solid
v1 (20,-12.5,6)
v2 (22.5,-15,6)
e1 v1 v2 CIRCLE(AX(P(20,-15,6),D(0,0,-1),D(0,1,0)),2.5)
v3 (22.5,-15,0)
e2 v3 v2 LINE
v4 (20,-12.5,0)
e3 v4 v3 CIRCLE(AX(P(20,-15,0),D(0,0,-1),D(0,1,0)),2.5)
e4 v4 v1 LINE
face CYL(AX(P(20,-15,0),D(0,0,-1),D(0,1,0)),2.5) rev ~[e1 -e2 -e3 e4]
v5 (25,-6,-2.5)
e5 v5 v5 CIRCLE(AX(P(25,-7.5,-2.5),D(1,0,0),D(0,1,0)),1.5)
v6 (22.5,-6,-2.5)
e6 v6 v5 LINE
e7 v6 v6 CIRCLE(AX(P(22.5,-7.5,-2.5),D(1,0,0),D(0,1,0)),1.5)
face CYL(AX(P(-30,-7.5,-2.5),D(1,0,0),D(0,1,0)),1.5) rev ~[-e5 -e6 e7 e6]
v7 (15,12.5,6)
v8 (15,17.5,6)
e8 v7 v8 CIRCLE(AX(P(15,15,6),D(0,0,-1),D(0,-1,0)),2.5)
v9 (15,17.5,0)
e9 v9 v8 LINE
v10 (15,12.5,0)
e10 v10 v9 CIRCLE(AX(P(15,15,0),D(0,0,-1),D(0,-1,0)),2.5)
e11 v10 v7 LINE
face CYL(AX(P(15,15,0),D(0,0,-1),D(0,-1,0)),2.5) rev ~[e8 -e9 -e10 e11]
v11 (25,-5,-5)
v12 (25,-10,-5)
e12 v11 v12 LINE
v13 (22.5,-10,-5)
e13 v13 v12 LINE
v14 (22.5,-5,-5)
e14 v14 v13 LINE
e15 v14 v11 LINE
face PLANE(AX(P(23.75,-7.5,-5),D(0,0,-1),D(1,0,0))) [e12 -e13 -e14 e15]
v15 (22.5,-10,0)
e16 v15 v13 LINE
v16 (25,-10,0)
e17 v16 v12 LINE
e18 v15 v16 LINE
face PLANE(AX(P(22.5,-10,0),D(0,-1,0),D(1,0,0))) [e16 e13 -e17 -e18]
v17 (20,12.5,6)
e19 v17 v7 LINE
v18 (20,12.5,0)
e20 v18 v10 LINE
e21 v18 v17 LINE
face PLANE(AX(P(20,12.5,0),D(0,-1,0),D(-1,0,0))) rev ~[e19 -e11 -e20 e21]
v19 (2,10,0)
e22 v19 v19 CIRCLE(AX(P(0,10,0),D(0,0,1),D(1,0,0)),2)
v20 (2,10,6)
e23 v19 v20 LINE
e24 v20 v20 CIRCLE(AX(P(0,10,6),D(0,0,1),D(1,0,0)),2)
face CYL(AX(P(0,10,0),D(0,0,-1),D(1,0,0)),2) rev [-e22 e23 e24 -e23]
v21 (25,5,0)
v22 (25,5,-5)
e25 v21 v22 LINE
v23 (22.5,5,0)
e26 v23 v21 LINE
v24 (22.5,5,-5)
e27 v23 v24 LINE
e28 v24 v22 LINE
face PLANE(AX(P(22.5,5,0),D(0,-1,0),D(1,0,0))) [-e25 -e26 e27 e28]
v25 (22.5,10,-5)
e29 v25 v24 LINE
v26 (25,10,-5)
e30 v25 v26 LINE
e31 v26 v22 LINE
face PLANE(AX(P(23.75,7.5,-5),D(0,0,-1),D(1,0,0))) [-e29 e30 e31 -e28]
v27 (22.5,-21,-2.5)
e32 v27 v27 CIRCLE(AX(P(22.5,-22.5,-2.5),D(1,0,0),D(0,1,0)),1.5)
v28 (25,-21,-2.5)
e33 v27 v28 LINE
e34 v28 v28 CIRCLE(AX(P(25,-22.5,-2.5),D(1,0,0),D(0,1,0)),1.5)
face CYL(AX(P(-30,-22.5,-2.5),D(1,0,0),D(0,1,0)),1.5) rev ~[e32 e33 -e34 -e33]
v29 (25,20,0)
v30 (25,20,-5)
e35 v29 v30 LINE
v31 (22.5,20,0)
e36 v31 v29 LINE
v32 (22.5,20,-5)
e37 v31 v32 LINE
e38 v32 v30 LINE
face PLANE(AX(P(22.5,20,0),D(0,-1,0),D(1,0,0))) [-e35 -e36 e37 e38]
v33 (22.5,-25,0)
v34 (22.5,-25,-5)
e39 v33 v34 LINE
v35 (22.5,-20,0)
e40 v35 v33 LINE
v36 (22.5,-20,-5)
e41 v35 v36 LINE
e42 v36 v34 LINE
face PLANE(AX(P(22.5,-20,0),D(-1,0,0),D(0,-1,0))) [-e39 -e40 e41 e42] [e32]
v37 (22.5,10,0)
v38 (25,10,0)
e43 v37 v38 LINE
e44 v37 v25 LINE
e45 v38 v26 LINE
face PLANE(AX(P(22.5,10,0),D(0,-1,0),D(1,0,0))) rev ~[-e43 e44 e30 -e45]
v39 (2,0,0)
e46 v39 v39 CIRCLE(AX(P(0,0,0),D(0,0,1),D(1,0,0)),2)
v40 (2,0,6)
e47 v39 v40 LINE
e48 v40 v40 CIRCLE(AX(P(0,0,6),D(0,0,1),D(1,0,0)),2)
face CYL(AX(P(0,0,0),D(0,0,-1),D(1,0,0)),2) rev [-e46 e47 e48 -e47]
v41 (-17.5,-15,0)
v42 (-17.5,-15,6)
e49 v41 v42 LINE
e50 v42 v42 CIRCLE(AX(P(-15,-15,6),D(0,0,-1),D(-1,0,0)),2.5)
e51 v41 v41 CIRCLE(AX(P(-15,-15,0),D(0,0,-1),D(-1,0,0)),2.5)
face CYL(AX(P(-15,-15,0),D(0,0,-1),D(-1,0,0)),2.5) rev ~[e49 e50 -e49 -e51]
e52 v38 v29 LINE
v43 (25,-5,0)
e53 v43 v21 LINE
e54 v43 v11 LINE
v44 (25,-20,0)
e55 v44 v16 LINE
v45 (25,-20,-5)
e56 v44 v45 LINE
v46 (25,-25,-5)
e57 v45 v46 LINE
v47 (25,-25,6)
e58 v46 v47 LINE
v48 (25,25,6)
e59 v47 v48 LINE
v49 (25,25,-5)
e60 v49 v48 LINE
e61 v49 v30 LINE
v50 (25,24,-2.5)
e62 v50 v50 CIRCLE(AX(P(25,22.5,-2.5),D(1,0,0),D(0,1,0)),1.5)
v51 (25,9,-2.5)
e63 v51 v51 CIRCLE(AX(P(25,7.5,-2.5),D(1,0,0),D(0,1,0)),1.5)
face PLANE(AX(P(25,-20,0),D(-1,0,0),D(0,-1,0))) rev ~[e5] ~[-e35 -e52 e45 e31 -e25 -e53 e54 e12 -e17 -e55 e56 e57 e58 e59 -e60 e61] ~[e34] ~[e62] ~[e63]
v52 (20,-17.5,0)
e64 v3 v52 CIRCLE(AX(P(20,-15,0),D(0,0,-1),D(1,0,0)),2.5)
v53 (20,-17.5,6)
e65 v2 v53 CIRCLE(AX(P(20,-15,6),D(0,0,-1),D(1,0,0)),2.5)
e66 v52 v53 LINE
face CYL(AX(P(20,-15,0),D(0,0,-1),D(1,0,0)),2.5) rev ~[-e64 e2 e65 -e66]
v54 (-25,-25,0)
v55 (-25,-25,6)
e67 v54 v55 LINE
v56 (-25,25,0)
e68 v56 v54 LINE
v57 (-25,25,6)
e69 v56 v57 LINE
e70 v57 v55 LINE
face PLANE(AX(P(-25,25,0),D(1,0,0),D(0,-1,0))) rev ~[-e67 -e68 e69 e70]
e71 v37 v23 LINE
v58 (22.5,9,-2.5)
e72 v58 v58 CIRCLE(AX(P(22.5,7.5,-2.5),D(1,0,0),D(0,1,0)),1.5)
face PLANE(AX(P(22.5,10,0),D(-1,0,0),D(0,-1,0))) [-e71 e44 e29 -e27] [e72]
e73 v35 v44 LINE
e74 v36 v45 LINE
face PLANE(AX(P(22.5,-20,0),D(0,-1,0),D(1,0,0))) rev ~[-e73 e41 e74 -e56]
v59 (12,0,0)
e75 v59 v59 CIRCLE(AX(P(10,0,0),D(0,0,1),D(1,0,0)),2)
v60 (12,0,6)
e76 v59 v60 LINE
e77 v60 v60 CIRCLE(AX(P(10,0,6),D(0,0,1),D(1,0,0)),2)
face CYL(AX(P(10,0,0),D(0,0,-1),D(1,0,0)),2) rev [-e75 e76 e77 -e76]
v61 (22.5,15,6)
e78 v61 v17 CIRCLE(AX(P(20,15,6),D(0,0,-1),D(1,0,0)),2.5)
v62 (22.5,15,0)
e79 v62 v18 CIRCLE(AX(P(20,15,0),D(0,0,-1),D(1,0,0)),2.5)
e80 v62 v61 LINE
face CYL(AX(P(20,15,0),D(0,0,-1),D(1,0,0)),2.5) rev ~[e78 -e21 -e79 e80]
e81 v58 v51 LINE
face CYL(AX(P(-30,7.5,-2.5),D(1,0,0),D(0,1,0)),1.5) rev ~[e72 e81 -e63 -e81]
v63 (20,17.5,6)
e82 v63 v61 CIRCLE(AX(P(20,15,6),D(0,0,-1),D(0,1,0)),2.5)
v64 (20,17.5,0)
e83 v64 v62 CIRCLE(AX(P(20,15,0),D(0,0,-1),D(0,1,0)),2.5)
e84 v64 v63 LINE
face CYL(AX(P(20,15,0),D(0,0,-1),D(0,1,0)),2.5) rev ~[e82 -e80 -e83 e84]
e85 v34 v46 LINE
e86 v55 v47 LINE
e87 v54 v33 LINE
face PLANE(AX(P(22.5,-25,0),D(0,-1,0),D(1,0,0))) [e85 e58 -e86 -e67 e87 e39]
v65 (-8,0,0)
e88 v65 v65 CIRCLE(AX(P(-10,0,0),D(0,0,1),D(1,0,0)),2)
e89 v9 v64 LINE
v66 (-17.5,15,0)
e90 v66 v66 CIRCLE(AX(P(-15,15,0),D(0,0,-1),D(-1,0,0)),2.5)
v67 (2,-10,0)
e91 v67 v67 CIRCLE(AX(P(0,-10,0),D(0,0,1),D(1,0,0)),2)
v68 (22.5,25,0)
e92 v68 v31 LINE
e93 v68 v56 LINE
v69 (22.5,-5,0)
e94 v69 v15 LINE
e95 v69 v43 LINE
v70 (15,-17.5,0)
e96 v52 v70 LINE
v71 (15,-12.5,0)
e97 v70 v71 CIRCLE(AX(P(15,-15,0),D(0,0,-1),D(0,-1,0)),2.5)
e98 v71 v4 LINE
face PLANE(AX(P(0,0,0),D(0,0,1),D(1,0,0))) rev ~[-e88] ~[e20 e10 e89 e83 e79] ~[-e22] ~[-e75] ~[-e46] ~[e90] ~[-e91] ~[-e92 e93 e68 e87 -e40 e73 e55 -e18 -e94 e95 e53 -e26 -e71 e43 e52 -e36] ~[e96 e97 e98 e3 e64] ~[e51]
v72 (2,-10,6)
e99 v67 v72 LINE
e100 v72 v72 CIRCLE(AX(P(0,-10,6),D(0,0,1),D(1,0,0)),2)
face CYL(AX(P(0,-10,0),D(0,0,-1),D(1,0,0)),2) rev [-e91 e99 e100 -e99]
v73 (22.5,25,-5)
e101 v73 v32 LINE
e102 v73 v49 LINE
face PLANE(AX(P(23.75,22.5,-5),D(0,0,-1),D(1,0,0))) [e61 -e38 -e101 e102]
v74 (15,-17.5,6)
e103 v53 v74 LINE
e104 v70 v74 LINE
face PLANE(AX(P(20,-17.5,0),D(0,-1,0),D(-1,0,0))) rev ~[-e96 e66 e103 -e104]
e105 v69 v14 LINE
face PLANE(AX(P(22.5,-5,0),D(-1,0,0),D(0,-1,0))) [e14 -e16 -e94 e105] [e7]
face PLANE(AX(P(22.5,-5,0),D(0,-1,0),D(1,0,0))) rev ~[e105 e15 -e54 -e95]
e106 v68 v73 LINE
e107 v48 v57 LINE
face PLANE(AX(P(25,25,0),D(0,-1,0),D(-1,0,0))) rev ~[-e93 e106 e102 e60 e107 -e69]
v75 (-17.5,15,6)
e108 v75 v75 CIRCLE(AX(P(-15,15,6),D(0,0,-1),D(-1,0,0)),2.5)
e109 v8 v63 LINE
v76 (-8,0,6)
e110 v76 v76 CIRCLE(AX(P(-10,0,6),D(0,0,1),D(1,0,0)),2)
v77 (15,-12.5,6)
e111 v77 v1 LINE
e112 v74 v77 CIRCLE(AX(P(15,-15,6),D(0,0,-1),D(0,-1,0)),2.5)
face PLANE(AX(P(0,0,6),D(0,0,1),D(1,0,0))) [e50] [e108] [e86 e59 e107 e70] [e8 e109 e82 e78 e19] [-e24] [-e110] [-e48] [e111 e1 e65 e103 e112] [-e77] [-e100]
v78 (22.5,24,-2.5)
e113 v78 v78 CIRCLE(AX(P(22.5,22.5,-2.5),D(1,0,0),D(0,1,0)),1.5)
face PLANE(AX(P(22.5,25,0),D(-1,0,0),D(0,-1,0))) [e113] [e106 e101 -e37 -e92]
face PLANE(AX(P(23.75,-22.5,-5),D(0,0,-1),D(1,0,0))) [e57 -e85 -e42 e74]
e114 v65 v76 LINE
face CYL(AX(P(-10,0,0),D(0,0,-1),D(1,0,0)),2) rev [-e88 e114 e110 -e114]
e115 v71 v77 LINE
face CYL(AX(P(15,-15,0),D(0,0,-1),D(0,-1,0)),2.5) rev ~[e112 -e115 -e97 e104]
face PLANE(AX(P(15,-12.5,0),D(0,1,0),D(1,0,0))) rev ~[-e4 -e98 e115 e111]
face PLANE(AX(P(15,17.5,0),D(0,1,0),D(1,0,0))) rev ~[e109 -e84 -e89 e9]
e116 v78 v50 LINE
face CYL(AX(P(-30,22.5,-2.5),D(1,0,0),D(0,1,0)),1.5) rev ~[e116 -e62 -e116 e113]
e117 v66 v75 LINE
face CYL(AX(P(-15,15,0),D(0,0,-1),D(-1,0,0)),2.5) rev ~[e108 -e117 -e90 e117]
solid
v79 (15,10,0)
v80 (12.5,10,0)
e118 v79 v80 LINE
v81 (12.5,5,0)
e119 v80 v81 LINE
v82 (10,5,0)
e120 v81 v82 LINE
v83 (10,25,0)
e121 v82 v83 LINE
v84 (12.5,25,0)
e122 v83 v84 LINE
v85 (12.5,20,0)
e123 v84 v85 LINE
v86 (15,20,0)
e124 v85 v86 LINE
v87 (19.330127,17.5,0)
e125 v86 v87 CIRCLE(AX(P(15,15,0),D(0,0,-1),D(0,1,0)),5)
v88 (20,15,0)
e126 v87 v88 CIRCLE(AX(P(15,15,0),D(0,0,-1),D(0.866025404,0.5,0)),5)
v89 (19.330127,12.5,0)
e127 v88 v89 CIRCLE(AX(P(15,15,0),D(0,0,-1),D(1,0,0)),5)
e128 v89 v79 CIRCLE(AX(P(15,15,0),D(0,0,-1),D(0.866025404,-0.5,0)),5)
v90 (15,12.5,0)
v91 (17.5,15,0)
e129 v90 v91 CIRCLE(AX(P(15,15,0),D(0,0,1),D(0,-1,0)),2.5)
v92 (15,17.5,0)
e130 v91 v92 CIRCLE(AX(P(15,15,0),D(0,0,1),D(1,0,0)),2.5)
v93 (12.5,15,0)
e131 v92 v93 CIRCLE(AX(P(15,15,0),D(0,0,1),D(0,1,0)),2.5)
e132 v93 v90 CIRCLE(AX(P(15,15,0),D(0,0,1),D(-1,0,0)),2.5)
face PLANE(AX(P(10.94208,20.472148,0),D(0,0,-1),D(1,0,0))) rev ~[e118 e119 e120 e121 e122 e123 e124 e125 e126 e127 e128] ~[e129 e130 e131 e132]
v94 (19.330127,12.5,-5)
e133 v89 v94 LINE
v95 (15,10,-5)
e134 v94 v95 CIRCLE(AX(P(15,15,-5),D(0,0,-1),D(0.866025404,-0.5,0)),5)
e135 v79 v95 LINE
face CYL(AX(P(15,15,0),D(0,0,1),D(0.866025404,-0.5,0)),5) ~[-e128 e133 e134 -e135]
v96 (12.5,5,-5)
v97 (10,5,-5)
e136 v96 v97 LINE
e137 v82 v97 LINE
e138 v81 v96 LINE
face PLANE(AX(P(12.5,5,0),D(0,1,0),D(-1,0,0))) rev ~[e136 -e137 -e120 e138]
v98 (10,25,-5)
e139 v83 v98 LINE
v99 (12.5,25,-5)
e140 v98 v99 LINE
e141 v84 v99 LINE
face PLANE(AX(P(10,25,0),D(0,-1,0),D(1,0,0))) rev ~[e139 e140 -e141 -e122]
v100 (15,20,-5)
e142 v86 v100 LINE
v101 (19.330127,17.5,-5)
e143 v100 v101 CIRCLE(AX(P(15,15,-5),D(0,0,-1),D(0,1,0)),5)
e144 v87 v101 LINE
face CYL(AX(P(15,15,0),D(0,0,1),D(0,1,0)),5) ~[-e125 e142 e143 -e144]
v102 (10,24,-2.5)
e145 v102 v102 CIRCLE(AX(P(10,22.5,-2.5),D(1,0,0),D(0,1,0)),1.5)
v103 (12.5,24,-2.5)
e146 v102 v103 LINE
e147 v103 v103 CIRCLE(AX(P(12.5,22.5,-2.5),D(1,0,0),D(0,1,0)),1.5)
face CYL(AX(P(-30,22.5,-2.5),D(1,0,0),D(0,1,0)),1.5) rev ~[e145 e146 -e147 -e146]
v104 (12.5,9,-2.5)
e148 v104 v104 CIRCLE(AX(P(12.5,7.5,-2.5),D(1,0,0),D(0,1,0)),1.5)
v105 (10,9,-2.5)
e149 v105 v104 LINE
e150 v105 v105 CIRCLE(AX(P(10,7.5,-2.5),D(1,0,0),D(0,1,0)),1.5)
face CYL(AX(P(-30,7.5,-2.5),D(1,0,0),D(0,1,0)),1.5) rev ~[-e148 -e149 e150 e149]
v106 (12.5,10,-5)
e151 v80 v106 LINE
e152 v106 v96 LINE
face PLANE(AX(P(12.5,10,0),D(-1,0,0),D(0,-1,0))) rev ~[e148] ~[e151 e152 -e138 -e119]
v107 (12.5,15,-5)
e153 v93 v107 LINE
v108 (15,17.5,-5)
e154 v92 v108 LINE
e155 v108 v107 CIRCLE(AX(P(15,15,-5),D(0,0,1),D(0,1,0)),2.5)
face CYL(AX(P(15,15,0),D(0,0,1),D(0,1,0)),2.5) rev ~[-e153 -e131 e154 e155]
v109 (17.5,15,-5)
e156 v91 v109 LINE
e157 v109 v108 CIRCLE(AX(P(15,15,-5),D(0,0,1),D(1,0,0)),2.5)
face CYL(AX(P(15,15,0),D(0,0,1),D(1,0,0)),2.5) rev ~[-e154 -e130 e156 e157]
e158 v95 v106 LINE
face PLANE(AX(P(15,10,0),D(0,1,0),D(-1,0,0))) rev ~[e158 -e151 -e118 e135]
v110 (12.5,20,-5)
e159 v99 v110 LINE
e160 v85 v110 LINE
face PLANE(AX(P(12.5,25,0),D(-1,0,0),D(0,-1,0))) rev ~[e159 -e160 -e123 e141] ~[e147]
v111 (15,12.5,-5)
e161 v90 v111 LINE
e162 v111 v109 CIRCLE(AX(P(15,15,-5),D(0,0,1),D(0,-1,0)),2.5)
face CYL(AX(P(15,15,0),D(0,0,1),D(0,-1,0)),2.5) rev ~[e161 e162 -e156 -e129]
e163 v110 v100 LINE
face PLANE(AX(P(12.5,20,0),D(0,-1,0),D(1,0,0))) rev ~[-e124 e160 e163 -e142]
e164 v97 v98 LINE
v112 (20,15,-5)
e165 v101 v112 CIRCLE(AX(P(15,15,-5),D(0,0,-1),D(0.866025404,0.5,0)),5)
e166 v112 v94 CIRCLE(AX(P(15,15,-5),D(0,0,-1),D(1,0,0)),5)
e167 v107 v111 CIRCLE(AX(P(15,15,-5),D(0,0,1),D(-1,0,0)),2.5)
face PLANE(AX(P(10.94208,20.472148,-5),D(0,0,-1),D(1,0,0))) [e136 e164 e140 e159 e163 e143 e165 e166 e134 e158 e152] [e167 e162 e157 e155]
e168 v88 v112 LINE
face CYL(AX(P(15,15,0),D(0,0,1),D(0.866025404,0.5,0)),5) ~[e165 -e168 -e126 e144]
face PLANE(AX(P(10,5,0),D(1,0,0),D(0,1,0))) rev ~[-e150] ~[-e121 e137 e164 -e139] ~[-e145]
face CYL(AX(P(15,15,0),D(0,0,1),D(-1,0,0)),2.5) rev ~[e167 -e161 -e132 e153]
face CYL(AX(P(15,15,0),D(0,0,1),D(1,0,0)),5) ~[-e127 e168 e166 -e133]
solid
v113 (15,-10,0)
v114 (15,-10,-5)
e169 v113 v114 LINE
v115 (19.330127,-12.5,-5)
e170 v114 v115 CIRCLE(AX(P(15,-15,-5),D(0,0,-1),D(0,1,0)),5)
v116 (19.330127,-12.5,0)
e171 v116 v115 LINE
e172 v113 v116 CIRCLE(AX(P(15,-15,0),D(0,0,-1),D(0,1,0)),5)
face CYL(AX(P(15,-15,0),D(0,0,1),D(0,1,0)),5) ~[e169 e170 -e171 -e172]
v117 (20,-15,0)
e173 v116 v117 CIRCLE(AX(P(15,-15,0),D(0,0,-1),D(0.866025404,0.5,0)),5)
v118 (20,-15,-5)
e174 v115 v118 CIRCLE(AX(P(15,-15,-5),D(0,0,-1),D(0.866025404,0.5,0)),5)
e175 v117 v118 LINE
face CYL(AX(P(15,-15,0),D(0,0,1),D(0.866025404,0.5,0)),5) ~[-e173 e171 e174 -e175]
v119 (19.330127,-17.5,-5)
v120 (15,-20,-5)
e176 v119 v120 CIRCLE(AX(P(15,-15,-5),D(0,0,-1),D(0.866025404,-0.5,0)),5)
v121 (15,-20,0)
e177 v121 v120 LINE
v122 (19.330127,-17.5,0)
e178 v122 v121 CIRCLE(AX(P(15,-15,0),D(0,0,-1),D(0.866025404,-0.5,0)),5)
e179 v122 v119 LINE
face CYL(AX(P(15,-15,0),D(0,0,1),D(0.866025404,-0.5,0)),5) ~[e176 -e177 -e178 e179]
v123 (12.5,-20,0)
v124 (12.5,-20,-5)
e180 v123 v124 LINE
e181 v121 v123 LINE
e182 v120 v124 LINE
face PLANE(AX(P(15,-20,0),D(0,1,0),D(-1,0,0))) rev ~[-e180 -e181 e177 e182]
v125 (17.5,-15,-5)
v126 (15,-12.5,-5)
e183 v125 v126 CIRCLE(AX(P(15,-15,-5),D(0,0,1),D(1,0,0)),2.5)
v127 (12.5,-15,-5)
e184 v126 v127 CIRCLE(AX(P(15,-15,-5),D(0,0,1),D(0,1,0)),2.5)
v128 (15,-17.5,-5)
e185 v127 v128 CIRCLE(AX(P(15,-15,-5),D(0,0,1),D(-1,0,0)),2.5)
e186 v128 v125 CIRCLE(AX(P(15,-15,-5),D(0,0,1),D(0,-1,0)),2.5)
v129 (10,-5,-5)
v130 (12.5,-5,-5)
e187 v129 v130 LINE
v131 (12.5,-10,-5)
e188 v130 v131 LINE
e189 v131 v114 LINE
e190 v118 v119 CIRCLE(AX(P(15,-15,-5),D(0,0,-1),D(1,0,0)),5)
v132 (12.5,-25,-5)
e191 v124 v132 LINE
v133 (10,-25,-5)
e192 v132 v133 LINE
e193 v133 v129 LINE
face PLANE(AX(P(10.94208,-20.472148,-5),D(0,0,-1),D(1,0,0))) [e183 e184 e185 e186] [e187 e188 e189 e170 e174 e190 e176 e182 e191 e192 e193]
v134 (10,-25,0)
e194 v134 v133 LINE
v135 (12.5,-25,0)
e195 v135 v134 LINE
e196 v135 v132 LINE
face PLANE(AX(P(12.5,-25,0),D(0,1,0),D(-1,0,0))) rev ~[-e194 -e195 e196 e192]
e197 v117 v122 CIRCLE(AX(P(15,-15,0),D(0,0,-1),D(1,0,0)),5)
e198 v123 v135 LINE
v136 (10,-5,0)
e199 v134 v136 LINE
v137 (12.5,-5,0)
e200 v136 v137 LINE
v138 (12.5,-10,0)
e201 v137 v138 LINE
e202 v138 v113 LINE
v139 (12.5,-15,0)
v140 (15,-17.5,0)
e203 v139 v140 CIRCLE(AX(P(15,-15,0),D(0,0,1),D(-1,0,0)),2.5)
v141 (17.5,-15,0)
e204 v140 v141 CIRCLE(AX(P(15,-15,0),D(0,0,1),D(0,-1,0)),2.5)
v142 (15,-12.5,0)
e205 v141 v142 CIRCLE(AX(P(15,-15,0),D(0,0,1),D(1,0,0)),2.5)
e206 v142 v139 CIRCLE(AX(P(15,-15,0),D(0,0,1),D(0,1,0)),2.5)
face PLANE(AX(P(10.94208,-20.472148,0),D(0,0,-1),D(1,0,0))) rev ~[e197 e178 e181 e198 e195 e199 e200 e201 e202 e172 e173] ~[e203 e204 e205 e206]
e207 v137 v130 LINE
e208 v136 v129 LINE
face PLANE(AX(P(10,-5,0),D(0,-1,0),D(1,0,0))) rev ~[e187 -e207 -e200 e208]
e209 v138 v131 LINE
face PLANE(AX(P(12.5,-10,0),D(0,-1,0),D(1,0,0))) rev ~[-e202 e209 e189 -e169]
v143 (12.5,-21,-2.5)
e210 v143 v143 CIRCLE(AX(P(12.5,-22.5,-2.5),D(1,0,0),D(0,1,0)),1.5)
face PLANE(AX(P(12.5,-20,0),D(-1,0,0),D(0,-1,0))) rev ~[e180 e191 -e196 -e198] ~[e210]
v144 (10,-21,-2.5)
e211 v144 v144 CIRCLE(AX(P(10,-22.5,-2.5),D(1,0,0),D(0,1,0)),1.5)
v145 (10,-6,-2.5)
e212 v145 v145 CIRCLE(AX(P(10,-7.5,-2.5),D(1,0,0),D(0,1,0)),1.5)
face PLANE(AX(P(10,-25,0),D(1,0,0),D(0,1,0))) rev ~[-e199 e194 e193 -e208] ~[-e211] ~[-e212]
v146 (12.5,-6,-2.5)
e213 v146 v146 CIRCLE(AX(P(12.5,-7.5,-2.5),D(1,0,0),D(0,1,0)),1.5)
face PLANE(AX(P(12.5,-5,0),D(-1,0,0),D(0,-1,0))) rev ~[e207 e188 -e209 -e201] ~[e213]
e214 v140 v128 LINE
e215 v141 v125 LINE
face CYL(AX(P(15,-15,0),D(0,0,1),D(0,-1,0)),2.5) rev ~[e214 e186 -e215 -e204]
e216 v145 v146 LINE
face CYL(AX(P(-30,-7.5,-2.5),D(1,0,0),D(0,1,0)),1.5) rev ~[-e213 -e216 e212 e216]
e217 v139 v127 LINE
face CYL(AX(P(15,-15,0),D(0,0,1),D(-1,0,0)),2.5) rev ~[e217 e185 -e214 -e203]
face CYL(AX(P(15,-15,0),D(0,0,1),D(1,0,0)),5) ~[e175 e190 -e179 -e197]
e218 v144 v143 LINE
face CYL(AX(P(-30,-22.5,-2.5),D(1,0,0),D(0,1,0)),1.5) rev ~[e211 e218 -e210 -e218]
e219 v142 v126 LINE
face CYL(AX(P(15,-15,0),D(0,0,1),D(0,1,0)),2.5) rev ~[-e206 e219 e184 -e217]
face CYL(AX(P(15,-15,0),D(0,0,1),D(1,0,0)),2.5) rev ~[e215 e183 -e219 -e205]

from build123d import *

# Parameters (mm, degrees)
F0_R             = 2
F1_DEPTH         = 6
F2_W             = 2.5
F2_H             = 5
F3_DEPTH         = 5
F5_DEPTH         = 5
F8_D             = 3
F8_DEPTH         = 40
F8_TIP           = 0.9012909285
F8_2_D           = 3
F8_2_DEPTH       = 40
F8_2_TIP         = 0.9012909285
F8_ON_F6_D       = 3
F8_ON_F6_DEPTH   = 40
F8_ON_F6_TIP     = 0.9012909285
F8_ON_F6_2_D     = 3
F8_ON_F6_2_DEPTH = 40
F8_ON_F6_2_TIP   = 0.9012909285


with BuildPart() as f1:
    # F0 (on Top) → F1 (new body)
    with BuildSketch(Plane.XY):
        Polygon((25, 15), (25, 25), (-25, 25), (-25, 15), (-25, -15), (-25, -25), (25, -25), (25, -15), align=None)
        with BuildLine():
            ThreePointArc((-12.5, -15), (-15, -17.5), (-17.5, -15))
            ThreePointArc((-17.5, -15), (-15, -12.5), (-12.5, -15))
        make_face(mode=Mode.SUBTRACT)
        with BuildLine():
            ThreePointArc((20, -12.5), (21.767766953, -13.232233047), (22.5, -15))
            ThreePointArc((22.5, -15), (21.767766953, -16.767766953), (20, -17.5))
            Line((20, -17.5), (15, -17.5))
            ThreePointArc((15, -17.5), (12.5, -15), (15, -12.5))
            Line((15, -12.5), (20, -12.5))
        make_face(mode=Mode.SUBTRACT)
        with Locations((0, -10)):
            Circle(F0_R, mode=Mode.SUBTRACT)
        with Locations((-10, 0)):
            Circle(F0_R, mode=Mode.SUBTRACT)
        with BuildLine():
            ThreePointArc((-12.5, 15), (-15, 12.5), (-17.5, 15))
            ThreePointArc((-17.5, 15), (-15, 17.5), (-12.5, 15))
        make_face(mode=Mode.SUBTRACT)
        Circle(F0_R, mode=Mode.SUBTRACT)
        with Locations((10, 0)):
            Circle(F0_R, mode=Mode.SUBTRACT)
        with Locations((0, 10)):
            Circle(F0_R, mode=Mode.SUBTRACT)
        with BuildLine():
            ThreePointArc((20, 17.5), (21.767766953, 16.767766953), (22.5, 15))
            ThreePointArc((22.5, 15), (21.767766953, 13.232233047), (20, 12.5))
            Line((20, 12.5), (15, 12.5))
            ThreePointArc((15, 12.5), (12.5, 15), (15, 17.5))
            Line((15, 17.5), (20, 17.5))
        make_face(mode=Mode.SUBTRACT)
    extrude(amount=F1_DEPTH)

    # F2 (on face) → F3 (join)
    with BuildSketch(Plane(origin=(0, 0, 0), x_dir=(1, 0, 0), z_dir=(0, 0, -1))):
        with Locations((23.75, 22.5)):
            Rectangle(F2_W, F2_H)
        with Locations((23.75, 7.5)):
            Rectangle(F2_W, F2_H)
        with Locations((23.75, -7.5)):
            Rectangle(F2_W, F2_H)
        with Locations((23.75, -22.5)):
            Rectangle(F2_W, F2_H)
    extrude(amount=F3_DEPTH)

    # F8
    with Locations(Plane(origin=(10, 0, 0), x_dir=(0, -1, 0), z_dir=(-1, 0, 0))):
        with Locations((-7.5, -2.5), (-22.5, -2.5)):
            Hole(F8_D / 2, depth=F8_DEPTH)
            with Locations((0, 0, -(F8_DEPTH + F8_TIP / 2))):  # 118° drill point
                Cone(0, F8_D / 2, F8_TIP, mode=Mode.SUBTRACT)

    # F8 on F6
    with Locations(Plane(origin=(10, 0, 0), x_dir=(0, -1, 0), z_dir=(-1, 0, 0))):
        with Locations((7.5, -2.5), (22.5, -2.5)):
            Hole(F8_ON_F6_D / 2, depth=F8_ON_F6_DEPTH)
            with Locations((0, 0, -(F8_ON_F6_DEPTH + F8_ON_F6_TIP / 2))):  # 118° drill point
                Cone(0, F8_ON_F6_D / 2, F8_ON_F6_TIP, mode=Mode.SUBTRACT)


with BuildPart() as f5:
    # F4 (on face) → F5 (new body)
    with BuildSketch(Plane(origin=(0, 0, 0), x_dir=(1, 0, 0), z_dir=(0, 0, -1))):
        with BuildLine():
            Line((12.5, 19.3301270189), (12.5, 20))
            Line((12.5, 20), (12.5, 25))
            Line((12.5, 25), (10, 25))
            Line((10, 25), (10, 15))
            ThreePointArc((10, 15), (10.6698729811, 17.5), (12.5, 19.3301270189))
        make_face()
        with BuildLine():
            Line((15, 20), (12.5, 20))
            Line((12.5, 20), (12.5, 19.3301270189))
            ThreePointArc((12.5, 19.3301270189), (13.7059047745, 19.8296291314), (15, 20))
        make_face()
        with BuildLine():
            ThreePointArc((15, 20), (13.7059047745, 19.8296291314), (12.5, 19.3301270189))
            Line((12.5, 19.3301270189), (12.5, 15))
            ThreePointArc((12.5, 15), (13.232233047, 16.767766953), (15, 17.5))
            Line((15, 17.5), (19.3301270189, 17.5))
            ThreePointArc((19.3301270189, 17.5), (17.5, 19.3301270189), (15, 20))
        make_face()
        with BuildLine():
            Line((12.5, 15), (12.5, 19.3301270189))
            ThreePointArc((12.5, 19.3301270189), (10.6698729811, 17.5), (10, 15))
            ThreePointArc((10, 15), (10.6698729811, 12.5), (12.5, 10.6698729811))
            Line((12.5, 10.6698729811), (12.5, 15))
        make_face()
        with BuildLine():
            ThreePointArc((15, 12.5), (13.232233047, 13.232233047), (12.5, 15))
            Line((12.5, 15), (12.5, 10.6698729811))
            ThreePointArc((12.5, 10.6698729811), (13.7059047745, 10.1703708686), (15, 10))
            ThreePointArc((15, 10), (17.5, 10.6698729811), (19.3301270189, 12.5))
            Line((19.3301270189, 12.5), (15, 12.5))
        make_face()
        with BuildLine():
            ThreePointArc((12.5, 10.6698729811), (10.6698729811, 12.5), (10, 15))
            Line((10, 15), (10, 5))
            Line((10, 5), (12.5, 5))
            Line((12.5, 5), (12.5, 10))
            Line((12.5, 10), (12.5, 10.6698729811))
        make_face()
        with BuildLine():
            ThreePointArc((20, 15), (19.8296291314, 16.2940952255), (19.3301270189, 17.5))
            Line((19.3301270189, 17.5), (15, 17.5))
            ThreePointArc((15, 17.5), (16.767766953, 16.767766953), (17.5, 15))
            ThreePointArc((17.5, 15), (16.767766953, 13.232233047), (15, 12.5))
            Line((15, 12.5), (19.3301270189, 12.5))
            ThreePointArc((19.3301270189, 12.5), (19.8296291314, 13.7059047745), (20, 15))
        make_face()
        with BuildLine():
            ThreePointArc((15, 10), (13.7059047745, 10.1703708686), (12.5, 10.6698729811))
            Line((12.5, 10.6698729811), (12.5, 10))
            Line((12.5, 10), (15, 10))
        make_face()
    extrude(amount=F5_DEPTH)

    # F8 on F6#2
    with Locations(Plane(origin=(10, 0, 0), x_dir=(0, -1, 0), z_dir=(-1, 0, 0))):
        with Locations((7.5, -2.5), (22.5, -2.5)):
            Hole(F8_ON_F6_2_D / 2, depth=F8_ON_F6_2_DEPTH)
            with Locations((0, 0, -(F8_ON_F6_2_DEPTH + F8_ON_F6_2_TIP / 2))):  # 118° drill point
                Cone(0, F8_ON_F6_2_D / 2, F8_ON_F6_2_TIP, mode=Mode.SUBTRACT)


with BuildPart() as f5b:
    # F4 (on face) → F5, piece 2 (new body)
    with BuildSketch(Plane(origin=(0, 0, 0), x_dir=(1, 0, 0), z_dir=(0, 0, -1))):
        with BuildLine():
            Line((10, -15), (10, -25))
            Line((10, -25), (12.5, -25))
            Line((12.5, -25), (12.5, -20))
            Line((12.5, -20), (12.5, -19.3301270189))
            ThreePointArc((12.5, -19.3301270189), (10.6698729811, -17.5), (10, -15))
        make_face()
        with BuildLine():
            Line((12.5, -10), (12.5, -5))
            Line((12.5, -5), (10, -5))
            Line((10, -5), (10, -15))
            ThreePointArc((10, -15), (10.6698729811, -12.5), (12.5, -10.6698729811))
            Line((12.5, -10.6698729811), (12.5, -10))
        make_face()
        with BuildLine():
            ThreePointArc((12.5, -10.6698729811), (10.6698729811, -12.5), (10, -15))
            ThreePointArc((10, -15), (10.6698729811, -17.5), (12.5, -19.3301270189))
            Line((12.5, -19.3301270189), (12.5, -15))
            Line((12.5, -15), (12.5, -10.6698729811))
        make_face()
        with BuildLine():
            Line((15, -10), (12.5, -10))
            Line((12.5, -10), (12.5, -10.6698729811))
            ThreePointArc((12.5, -10.6698729811), (13.7059047745, -10.1703708686), (15, -10))
        make_face()
        with BuildLine():
            ThreePointArc((15, -10), (13.7059047745, -10.1703708686), (12.5, -10.6698729811))
            Line((12.5, -10.6698729811), (12.5, -15))
            ThreePointArc((12.5, -15), (13.232233047, -13.232233047), (15, -12.5))
            Line((15, -12.5), (19.3301270189, -12.5))
            ThreePointArc((19.3301270189, -12.5), (17.5, -10.6698729811), (15, -10))
        make_face()
        with BuildLine():
            ThreePointArc((15, -20), (13.7059047745, -19.8296291314), (12.5, -19.3301270189))
            Line((12.5, -19.3301270189), (12.5, -20))
            Line((12.5, -20), (15, -20))
        make_face()
        with BuildLine():
            Line((12.5, -15), (12.5, -19.3301270189))
            ThreePointArc((12.5, -19.3301270189), (13.7059047745, -19.8296291314), (15, -20))
            ThreePointArc((15, -20), (17.5, -19.3301270189), (19.3301270189, -17.5))
            Line((19.3301270189, -17.5), (15, -17.5))
            ThreePointArc((15, -17.5), (13.232233047, -16.767766953), (12.5, -15))
        make_face()
        with BuildLine():
            ThreePointArc((20, -15), (19.8296291314, -13.7059047745), (19.3301270189, -12.5))
            Line((19.3301270189, -12.5), (15, -12.5))
            ThreePointArc((15, -12.5), (16.767766953, -13.232233047), (17.5, -15))
            ThreePointArc((17.5, -15), (16.767766953, -16.767766953), (15, -17.5))
            Line((15, -17.5), (19.3301270189, -17.5))
            ThreePointArc((19.3301270189, -17.5), (19.8296291314, -16.2940952255), (20, -15))
        make_face()
    extrude(amount=F5_DEPTH)

    # F8#2
    with Locations(Plane(origin=(10, 0, 0), x_dir=(0, -1, 0), z_dir=(-1, 0, 0))):
        with Locations((-7.5, -2.5), (-22.5, -2.5)):
            Hole(F8_2_D / 2, depth=F8_2_DEPTH)
            with Locations((0, 0, -(F8_2_DEPTH + F8_2_TIP / 2))):  # 118° drill point
                Cone(0, F8_2_D / 2, F8_2_TIP, mode=Mode.SUBTRACT)


solid = Compound([f1.part, f5.part, f5b.part])
